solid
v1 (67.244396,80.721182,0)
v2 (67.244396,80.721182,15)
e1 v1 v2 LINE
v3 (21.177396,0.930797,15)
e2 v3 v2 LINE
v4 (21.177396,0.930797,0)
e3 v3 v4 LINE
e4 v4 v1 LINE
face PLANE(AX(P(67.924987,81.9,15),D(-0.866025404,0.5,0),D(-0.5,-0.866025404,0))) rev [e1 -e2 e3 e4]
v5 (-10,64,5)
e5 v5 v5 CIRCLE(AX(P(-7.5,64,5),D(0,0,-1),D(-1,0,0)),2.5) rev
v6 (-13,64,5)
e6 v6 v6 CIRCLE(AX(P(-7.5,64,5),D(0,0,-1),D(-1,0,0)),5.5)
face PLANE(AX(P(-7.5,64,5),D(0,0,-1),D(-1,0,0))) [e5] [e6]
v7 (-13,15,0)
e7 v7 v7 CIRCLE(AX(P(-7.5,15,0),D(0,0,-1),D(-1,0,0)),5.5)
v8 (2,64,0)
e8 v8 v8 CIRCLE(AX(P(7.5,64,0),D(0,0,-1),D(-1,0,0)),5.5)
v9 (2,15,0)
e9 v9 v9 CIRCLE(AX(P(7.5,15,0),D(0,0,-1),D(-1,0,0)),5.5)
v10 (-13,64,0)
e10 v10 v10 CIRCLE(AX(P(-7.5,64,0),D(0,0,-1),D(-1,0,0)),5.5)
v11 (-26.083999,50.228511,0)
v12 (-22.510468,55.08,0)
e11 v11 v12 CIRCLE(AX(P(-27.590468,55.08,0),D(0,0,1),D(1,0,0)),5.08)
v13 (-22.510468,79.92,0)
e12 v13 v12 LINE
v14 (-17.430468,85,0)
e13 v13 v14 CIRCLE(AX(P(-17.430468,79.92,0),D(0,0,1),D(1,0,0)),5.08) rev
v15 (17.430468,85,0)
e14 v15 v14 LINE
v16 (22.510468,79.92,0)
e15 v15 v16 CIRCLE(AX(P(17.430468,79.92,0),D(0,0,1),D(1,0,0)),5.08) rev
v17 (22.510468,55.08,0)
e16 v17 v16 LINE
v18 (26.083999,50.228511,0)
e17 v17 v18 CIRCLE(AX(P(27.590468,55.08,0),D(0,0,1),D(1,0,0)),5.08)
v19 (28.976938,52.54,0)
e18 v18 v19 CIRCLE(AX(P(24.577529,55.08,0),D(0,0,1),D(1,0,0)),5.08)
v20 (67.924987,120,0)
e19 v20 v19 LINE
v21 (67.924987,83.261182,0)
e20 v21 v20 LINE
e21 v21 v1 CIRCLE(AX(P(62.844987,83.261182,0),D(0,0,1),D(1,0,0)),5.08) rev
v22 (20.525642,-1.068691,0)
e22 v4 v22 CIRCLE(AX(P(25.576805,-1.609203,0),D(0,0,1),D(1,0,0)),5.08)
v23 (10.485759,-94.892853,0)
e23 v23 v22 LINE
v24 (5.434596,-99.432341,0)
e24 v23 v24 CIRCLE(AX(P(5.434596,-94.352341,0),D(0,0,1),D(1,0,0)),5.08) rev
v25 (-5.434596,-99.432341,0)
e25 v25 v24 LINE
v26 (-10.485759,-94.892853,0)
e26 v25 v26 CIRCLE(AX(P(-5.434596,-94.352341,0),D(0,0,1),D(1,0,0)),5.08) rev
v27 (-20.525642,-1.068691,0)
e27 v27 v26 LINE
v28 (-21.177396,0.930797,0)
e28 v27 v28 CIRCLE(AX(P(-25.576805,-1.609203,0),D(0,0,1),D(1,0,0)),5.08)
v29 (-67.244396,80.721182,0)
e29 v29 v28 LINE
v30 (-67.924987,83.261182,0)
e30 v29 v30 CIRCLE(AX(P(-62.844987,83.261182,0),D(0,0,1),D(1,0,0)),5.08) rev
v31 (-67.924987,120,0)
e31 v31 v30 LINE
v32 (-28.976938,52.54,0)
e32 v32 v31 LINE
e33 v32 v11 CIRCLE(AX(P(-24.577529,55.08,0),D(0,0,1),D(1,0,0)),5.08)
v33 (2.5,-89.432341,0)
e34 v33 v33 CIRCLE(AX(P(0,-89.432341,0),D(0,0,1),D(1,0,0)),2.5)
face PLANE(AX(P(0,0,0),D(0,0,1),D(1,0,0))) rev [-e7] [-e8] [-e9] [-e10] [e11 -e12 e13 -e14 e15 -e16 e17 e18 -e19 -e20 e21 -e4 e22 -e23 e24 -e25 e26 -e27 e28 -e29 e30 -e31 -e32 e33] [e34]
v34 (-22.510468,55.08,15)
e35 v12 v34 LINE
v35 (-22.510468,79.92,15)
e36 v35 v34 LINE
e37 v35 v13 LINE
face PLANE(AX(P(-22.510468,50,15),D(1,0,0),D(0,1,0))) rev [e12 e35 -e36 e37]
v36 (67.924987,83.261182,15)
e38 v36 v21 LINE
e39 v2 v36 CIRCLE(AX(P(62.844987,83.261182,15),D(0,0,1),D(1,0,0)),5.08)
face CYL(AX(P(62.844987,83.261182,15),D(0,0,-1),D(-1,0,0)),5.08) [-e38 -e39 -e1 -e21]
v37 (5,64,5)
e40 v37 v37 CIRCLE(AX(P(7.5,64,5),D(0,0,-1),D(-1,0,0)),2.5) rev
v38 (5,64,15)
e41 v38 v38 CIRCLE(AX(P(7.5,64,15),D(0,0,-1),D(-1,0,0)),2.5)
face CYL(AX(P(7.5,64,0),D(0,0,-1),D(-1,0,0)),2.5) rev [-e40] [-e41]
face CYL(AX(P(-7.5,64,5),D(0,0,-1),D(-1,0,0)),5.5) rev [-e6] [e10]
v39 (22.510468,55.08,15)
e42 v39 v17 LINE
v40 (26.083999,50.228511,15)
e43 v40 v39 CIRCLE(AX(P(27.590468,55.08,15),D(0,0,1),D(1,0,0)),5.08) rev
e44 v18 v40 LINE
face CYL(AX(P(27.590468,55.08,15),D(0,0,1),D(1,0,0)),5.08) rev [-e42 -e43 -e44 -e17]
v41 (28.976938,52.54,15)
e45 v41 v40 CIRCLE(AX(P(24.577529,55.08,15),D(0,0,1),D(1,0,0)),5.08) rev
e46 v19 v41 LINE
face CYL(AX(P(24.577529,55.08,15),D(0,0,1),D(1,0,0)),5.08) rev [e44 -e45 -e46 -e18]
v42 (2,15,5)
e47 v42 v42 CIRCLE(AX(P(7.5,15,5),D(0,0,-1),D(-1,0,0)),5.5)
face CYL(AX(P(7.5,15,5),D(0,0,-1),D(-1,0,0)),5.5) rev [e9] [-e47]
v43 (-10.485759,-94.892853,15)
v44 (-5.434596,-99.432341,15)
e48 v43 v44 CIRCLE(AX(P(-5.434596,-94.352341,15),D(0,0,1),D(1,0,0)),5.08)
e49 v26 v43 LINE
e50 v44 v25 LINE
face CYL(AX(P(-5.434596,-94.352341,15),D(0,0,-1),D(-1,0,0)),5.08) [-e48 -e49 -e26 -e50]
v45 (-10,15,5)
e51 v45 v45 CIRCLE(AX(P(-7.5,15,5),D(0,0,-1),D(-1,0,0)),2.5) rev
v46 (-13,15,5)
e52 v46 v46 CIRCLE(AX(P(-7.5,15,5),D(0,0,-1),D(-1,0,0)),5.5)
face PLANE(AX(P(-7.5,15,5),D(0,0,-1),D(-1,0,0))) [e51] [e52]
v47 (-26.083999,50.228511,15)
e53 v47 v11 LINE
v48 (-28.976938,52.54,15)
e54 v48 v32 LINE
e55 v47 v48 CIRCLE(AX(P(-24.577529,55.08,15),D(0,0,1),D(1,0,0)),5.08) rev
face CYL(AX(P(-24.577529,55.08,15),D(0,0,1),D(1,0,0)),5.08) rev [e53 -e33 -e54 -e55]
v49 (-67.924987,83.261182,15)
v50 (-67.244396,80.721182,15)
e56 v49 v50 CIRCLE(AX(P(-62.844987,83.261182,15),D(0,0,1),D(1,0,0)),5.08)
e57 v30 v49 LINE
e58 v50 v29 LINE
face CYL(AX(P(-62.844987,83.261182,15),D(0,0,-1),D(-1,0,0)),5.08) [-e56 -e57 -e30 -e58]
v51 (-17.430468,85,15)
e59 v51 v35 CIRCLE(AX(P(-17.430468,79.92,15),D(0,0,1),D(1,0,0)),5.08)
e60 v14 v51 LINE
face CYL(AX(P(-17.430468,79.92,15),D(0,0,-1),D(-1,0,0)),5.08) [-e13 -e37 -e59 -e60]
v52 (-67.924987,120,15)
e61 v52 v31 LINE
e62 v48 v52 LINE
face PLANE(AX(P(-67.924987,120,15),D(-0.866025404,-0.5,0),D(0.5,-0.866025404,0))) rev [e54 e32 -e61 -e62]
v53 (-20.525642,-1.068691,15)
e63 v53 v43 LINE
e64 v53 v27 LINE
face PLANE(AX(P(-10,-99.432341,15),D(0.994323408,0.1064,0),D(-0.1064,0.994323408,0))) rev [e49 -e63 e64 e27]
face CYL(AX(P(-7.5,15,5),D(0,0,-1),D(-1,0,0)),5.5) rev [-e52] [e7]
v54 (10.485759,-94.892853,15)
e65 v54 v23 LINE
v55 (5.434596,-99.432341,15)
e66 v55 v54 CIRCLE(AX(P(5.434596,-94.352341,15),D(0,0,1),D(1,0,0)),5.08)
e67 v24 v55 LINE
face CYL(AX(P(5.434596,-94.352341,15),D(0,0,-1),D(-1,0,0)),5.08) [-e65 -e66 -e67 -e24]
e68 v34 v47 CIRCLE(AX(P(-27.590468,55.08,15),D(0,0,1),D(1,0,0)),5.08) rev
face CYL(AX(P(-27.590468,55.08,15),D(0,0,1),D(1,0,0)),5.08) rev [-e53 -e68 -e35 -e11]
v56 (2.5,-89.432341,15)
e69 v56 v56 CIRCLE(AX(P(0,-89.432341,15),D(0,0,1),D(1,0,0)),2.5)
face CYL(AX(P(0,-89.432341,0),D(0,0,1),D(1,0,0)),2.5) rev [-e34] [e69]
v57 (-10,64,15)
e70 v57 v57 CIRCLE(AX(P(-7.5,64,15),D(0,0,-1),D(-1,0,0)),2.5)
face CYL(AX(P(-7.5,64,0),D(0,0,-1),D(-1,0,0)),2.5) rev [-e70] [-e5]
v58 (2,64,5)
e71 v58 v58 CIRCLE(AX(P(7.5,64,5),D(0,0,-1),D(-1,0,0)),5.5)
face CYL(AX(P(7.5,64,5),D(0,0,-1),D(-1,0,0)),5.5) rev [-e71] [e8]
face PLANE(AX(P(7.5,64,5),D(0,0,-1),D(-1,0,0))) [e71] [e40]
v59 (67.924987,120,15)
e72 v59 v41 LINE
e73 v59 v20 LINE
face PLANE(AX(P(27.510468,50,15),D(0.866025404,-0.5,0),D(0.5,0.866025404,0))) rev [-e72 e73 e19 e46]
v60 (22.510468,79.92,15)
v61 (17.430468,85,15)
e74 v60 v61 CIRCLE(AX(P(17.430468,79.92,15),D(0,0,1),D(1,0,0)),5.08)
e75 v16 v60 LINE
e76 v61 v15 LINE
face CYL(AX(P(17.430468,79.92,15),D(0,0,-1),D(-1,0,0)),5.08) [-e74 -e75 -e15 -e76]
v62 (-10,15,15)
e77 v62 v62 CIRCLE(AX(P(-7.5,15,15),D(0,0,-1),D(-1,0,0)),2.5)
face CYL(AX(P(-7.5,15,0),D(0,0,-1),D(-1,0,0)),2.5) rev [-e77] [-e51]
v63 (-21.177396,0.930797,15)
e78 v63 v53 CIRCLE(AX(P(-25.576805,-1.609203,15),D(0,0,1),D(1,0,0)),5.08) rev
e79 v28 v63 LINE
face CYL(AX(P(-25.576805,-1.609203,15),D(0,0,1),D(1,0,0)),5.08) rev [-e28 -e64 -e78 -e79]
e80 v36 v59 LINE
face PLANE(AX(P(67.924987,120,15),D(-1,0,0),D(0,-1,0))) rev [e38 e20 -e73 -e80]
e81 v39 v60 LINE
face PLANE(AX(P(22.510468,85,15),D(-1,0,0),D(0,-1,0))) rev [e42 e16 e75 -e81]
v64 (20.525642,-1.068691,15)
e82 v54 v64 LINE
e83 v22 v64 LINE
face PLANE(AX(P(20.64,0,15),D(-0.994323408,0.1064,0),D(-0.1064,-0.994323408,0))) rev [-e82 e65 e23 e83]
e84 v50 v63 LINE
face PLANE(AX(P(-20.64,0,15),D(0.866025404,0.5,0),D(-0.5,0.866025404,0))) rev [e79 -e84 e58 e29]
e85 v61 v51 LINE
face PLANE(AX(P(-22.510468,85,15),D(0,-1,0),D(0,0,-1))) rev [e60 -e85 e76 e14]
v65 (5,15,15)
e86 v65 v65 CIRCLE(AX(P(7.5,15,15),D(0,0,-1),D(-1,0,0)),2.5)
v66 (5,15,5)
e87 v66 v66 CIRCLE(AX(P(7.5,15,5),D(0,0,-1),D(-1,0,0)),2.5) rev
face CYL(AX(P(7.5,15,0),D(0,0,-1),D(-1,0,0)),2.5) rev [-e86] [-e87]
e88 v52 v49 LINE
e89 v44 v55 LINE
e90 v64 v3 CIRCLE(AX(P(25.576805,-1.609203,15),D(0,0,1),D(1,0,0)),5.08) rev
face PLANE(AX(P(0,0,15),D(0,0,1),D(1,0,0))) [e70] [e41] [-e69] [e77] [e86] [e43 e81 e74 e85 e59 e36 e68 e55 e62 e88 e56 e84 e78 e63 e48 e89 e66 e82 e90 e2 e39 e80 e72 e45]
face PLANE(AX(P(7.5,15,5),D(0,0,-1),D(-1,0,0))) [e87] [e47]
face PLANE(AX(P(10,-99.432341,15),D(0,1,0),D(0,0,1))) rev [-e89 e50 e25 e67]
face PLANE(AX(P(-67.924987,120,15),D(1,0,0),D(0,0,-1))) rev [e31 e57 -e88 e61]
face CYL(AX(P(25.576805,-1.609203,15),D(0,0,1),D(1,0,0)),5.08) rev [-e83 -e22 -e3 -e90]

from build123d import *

# Parameters (mm, degrees)
BOSS_EXTRUDE1_DEPTH   = 15
FILLET1_R             = 5.08
F_5_0MM_DOWEL_HOLE1_D = 5
SKETCH16_R            = 5.5
CUT_EXTRUDE2_DEPTH    = 5
SKETCH14_R            = 2.5
CUT_EXTRUDE1_DEPTH    = 139.704015318
LPATTERN2_COUNT       = 2
LPATTERN2_PITCH       = 49


with BuildPart() as part:
    # Sketch1 → Boss-Extrude1 (new body)
    with BuildSketch(Plane.XY):
        Polygon((27.510468203, 50), (67.924987047, 120), (67.924987047, 81.9), (20.64, 0), (10, -99.432340815), (-10, -99.432340815), (-20.64, 0), (-67.924987047, 81.9), (-67.924987047, 120), (-27.510468203, 50), (-22.510468203, 50), (-22.510468203, 85), (22.510468203, 85), (22.510468203, 50), align=None)
    extrude(amount=BOSS_EXTRUDE1_DEPTH)

    # Fillet1
    # the kernel refuses this fillet: 5.08 mm, written as the material it adds along each edge
    with BuildSketch(Plane(origin=(20.64, 0, 0), x_dir=(0.5000000000000017, 0.8660254037844377, 0), z_dir=(0, 0, 1)), Plane(origin=(-20.64, 0, 0), x_dir=(0.10639999999998911, -0.9943234081524995, 0), z_dir=(0, 0, 1))) as fillet1_piece_1:
        with BuildLine():
            CenterArc((FILLET1_R * 0.211573226201, -FILLET1_R), FILLET1_R, 90, 23.892167456)
            Line((-FILLET1_R * 0.193443374913, -FILLET1_R * 0.0856906689624), (0, 0))
            Line((0, 0), (FILLET1_R * 0.211573226201, 0))
        make_face()
    extrude(amount=15)
    with BuildSketch(Plane(origin=(27.510468203, 50, 0), x_dir=(0.4999999999999992, 0.8660254037844392, 0), z_dir=(0, 0, 1))) as fillet1_piece_2:
        with BuildLine():
            CenterArc((FILLET1_R * 0.57735026919, FILLET1_R), FILLET1_R, 210, 60)
            Line((-FILLET1_R * 0.288675134595, FILLET1_R * 0.5), (0, 0))
            Line((0, 0), (FILLET1_R * 0.57735026919, 0))
        make_face()
    extrude(amount=15)
    with BuildSketch(Plane(origin=(22.510468203, 50, 0), x_dir=(0, 1, 0), z_dir=(0, 0, 1)), Plane(origin=(-22.510468203, 50, 0), x_dir=(-1, 0, 0), z_dir=(0, 0, 1))) as fillet1_piece_3:
        with BuildLine():
            CenterArc((FILLET1_R, -FILLET1_R), FILLET1_R, 90, 90)
            Line((0, -FILLET1_R), (0, 0))
            Line((0, 0), (FILLET1_R, 0))
        make_face()
    extrude(amount=15)
    with BuildSketch(Plane(origin=(-27.510468203, 50, 0), x_dir=(-0.5000000000000053, 0.8660254037844356, 0), z_dir=(0, 0, 1))) as fillet1_piece_4:
        with BuildLine():
            CenterArc((FILLET1_R * 0.57735026919, -FILLET1_R), FILLET1_R, 90, 60)
            Line((-FILLET1_R * 0.288675134595, -FILLET1_R * 0.5), (0, 0))
            Line((0, 0), (FILLET1_R * 0.57735026919, 0))
        make_face()
    extrude(amount=15)
    # the kernel refuses this fillet: 5.08 mm, written as the material it takes off along each edge
    with BuildSketch(Plane(origin=(-10, -99.432340815, -11.413509837), x_dir=(-0.10639999999999113, 0.9943234081524995, 0), z_dir=(0, 0, 1)), Plane(origin=(10, -99.432340815, -11.413509837), x_dir=(-1, 0, 0), z_dir=(0, 0, 1))) as fillet1_2_piece_1:
        with BuildLine():
            CenterArc((FILLET1_R * 0.89870156196, -FILLET1_R), FILLET1_R, 90, 83.892167456)
            Line((-FILLET1_R * 0.0956218461925, -FILLET1_R * 0.8936), (0, 0))
            Line((0, 0), (FILLET1_R * 0.89870156196, 0))
        make_face()
    extrude(amount=37.827019674, mode=Mode.SUBTRACT)
    with BuildSketch(Plane(origin=(67.924987047, 81.9, -3.402954744), x_dir=(-0.4999999999999986, -0.8660254037844396, 0), z_dir=(0, 0, 1)), Plane(origin=(-67.924987047, 81.9, -3.402954744), x_dir=(0, 1, 0), z_dir=(0, 0, 1))) as fillet1_2_piece_2:
        with BuildLine():
            CenterArc((FILLET1_R * 0.267949192431, -FILLET1_R), FILLET1_R, 90, 30)
            Line((-FILLET1_R * 0.232050807569, -FILLET1_R * 0.133974596216), (0, 0))
            Line((0, 0), (FILLET1_R * 0.267949192431, 0))
        make_face()
    extrude(amount=21.805909488, mode=Mode.SUBTRACT)
    with BuildSketch(Plane(origin=(-22.510468203, 85, -12.7), x_dir=(1, 0, 0), z_dir=(0, 0, 1)), Plane(origin=(22.510468203, 85, -12.7), x_dir=(0, -1, 0), z_dir=(0, 0, 1))) as fillet1_2_piece_3:
        with BuildLine():
            CenterArc((FILLET1_R, -FILLET1_R), FILLET1_R, 90, 90)
            Line((0, -FILLET1_R), (0, 0))
            Line((0, 0), (FILLET1_R, 0))
        make_face()
    extrude(amount=40.4, mode=Mode.SUBTRACT)

    # Ø5.0mm Dowel Hole1 (through all)
    with Locations(Plane(origin=(0, 0, 0), x_dir=(-1, 0, 0), z_dir=(0, 0, -1))):
        with Locations((7.5, 15), (-7.5, 15)):
            f_5_0mm_dowel_hole1 = Hole(F_5_0MM_DOWEL_HOLE1_D / 2)

    # Sketch16 → Cut-Extrude2 (cut)
    with BuildSketch(Plane(origin=(0, 0, 0), x_dir=(-1, 0, 0), z_dir=(0, 0, -1))):
        with Locations((-7.5, 15)):
            Circle(SKETCH16_R)
        with Locations((7.5, 15)):
            Circle(SKETCH16_R)
    cut_extrude2 = extrude(amount=-CUT_EXTRUDE2_DEPTH, mode=Mode.SUBTRACT)

    # Sketch14 → Cut-Extrude1 (cut, through all)
    with BuildSketch(Plane.XY.offset(15)):
        with Locations((0, -89.432340815)):
            Circle(SKETCH14_R)
    extrude(amount=-CUT_EXTRUDE1_DEPTH, mode=Mode.SUBTRACT)

    # LPattern2: Ø5.0mm Dowel Hole1, Cut-Extrude2 ×2
    with Locations(*[(0, i * LPATTERN2_PITCH, 0) for i in range(1, LPATTERN2_COUNT)]):
        add(f_5_0mm_dowel_hole1, mode=Mode.SUBTRACT)
        add(cut_extrude2, mode=Mode.SUBTRACT)


solid = part.part
